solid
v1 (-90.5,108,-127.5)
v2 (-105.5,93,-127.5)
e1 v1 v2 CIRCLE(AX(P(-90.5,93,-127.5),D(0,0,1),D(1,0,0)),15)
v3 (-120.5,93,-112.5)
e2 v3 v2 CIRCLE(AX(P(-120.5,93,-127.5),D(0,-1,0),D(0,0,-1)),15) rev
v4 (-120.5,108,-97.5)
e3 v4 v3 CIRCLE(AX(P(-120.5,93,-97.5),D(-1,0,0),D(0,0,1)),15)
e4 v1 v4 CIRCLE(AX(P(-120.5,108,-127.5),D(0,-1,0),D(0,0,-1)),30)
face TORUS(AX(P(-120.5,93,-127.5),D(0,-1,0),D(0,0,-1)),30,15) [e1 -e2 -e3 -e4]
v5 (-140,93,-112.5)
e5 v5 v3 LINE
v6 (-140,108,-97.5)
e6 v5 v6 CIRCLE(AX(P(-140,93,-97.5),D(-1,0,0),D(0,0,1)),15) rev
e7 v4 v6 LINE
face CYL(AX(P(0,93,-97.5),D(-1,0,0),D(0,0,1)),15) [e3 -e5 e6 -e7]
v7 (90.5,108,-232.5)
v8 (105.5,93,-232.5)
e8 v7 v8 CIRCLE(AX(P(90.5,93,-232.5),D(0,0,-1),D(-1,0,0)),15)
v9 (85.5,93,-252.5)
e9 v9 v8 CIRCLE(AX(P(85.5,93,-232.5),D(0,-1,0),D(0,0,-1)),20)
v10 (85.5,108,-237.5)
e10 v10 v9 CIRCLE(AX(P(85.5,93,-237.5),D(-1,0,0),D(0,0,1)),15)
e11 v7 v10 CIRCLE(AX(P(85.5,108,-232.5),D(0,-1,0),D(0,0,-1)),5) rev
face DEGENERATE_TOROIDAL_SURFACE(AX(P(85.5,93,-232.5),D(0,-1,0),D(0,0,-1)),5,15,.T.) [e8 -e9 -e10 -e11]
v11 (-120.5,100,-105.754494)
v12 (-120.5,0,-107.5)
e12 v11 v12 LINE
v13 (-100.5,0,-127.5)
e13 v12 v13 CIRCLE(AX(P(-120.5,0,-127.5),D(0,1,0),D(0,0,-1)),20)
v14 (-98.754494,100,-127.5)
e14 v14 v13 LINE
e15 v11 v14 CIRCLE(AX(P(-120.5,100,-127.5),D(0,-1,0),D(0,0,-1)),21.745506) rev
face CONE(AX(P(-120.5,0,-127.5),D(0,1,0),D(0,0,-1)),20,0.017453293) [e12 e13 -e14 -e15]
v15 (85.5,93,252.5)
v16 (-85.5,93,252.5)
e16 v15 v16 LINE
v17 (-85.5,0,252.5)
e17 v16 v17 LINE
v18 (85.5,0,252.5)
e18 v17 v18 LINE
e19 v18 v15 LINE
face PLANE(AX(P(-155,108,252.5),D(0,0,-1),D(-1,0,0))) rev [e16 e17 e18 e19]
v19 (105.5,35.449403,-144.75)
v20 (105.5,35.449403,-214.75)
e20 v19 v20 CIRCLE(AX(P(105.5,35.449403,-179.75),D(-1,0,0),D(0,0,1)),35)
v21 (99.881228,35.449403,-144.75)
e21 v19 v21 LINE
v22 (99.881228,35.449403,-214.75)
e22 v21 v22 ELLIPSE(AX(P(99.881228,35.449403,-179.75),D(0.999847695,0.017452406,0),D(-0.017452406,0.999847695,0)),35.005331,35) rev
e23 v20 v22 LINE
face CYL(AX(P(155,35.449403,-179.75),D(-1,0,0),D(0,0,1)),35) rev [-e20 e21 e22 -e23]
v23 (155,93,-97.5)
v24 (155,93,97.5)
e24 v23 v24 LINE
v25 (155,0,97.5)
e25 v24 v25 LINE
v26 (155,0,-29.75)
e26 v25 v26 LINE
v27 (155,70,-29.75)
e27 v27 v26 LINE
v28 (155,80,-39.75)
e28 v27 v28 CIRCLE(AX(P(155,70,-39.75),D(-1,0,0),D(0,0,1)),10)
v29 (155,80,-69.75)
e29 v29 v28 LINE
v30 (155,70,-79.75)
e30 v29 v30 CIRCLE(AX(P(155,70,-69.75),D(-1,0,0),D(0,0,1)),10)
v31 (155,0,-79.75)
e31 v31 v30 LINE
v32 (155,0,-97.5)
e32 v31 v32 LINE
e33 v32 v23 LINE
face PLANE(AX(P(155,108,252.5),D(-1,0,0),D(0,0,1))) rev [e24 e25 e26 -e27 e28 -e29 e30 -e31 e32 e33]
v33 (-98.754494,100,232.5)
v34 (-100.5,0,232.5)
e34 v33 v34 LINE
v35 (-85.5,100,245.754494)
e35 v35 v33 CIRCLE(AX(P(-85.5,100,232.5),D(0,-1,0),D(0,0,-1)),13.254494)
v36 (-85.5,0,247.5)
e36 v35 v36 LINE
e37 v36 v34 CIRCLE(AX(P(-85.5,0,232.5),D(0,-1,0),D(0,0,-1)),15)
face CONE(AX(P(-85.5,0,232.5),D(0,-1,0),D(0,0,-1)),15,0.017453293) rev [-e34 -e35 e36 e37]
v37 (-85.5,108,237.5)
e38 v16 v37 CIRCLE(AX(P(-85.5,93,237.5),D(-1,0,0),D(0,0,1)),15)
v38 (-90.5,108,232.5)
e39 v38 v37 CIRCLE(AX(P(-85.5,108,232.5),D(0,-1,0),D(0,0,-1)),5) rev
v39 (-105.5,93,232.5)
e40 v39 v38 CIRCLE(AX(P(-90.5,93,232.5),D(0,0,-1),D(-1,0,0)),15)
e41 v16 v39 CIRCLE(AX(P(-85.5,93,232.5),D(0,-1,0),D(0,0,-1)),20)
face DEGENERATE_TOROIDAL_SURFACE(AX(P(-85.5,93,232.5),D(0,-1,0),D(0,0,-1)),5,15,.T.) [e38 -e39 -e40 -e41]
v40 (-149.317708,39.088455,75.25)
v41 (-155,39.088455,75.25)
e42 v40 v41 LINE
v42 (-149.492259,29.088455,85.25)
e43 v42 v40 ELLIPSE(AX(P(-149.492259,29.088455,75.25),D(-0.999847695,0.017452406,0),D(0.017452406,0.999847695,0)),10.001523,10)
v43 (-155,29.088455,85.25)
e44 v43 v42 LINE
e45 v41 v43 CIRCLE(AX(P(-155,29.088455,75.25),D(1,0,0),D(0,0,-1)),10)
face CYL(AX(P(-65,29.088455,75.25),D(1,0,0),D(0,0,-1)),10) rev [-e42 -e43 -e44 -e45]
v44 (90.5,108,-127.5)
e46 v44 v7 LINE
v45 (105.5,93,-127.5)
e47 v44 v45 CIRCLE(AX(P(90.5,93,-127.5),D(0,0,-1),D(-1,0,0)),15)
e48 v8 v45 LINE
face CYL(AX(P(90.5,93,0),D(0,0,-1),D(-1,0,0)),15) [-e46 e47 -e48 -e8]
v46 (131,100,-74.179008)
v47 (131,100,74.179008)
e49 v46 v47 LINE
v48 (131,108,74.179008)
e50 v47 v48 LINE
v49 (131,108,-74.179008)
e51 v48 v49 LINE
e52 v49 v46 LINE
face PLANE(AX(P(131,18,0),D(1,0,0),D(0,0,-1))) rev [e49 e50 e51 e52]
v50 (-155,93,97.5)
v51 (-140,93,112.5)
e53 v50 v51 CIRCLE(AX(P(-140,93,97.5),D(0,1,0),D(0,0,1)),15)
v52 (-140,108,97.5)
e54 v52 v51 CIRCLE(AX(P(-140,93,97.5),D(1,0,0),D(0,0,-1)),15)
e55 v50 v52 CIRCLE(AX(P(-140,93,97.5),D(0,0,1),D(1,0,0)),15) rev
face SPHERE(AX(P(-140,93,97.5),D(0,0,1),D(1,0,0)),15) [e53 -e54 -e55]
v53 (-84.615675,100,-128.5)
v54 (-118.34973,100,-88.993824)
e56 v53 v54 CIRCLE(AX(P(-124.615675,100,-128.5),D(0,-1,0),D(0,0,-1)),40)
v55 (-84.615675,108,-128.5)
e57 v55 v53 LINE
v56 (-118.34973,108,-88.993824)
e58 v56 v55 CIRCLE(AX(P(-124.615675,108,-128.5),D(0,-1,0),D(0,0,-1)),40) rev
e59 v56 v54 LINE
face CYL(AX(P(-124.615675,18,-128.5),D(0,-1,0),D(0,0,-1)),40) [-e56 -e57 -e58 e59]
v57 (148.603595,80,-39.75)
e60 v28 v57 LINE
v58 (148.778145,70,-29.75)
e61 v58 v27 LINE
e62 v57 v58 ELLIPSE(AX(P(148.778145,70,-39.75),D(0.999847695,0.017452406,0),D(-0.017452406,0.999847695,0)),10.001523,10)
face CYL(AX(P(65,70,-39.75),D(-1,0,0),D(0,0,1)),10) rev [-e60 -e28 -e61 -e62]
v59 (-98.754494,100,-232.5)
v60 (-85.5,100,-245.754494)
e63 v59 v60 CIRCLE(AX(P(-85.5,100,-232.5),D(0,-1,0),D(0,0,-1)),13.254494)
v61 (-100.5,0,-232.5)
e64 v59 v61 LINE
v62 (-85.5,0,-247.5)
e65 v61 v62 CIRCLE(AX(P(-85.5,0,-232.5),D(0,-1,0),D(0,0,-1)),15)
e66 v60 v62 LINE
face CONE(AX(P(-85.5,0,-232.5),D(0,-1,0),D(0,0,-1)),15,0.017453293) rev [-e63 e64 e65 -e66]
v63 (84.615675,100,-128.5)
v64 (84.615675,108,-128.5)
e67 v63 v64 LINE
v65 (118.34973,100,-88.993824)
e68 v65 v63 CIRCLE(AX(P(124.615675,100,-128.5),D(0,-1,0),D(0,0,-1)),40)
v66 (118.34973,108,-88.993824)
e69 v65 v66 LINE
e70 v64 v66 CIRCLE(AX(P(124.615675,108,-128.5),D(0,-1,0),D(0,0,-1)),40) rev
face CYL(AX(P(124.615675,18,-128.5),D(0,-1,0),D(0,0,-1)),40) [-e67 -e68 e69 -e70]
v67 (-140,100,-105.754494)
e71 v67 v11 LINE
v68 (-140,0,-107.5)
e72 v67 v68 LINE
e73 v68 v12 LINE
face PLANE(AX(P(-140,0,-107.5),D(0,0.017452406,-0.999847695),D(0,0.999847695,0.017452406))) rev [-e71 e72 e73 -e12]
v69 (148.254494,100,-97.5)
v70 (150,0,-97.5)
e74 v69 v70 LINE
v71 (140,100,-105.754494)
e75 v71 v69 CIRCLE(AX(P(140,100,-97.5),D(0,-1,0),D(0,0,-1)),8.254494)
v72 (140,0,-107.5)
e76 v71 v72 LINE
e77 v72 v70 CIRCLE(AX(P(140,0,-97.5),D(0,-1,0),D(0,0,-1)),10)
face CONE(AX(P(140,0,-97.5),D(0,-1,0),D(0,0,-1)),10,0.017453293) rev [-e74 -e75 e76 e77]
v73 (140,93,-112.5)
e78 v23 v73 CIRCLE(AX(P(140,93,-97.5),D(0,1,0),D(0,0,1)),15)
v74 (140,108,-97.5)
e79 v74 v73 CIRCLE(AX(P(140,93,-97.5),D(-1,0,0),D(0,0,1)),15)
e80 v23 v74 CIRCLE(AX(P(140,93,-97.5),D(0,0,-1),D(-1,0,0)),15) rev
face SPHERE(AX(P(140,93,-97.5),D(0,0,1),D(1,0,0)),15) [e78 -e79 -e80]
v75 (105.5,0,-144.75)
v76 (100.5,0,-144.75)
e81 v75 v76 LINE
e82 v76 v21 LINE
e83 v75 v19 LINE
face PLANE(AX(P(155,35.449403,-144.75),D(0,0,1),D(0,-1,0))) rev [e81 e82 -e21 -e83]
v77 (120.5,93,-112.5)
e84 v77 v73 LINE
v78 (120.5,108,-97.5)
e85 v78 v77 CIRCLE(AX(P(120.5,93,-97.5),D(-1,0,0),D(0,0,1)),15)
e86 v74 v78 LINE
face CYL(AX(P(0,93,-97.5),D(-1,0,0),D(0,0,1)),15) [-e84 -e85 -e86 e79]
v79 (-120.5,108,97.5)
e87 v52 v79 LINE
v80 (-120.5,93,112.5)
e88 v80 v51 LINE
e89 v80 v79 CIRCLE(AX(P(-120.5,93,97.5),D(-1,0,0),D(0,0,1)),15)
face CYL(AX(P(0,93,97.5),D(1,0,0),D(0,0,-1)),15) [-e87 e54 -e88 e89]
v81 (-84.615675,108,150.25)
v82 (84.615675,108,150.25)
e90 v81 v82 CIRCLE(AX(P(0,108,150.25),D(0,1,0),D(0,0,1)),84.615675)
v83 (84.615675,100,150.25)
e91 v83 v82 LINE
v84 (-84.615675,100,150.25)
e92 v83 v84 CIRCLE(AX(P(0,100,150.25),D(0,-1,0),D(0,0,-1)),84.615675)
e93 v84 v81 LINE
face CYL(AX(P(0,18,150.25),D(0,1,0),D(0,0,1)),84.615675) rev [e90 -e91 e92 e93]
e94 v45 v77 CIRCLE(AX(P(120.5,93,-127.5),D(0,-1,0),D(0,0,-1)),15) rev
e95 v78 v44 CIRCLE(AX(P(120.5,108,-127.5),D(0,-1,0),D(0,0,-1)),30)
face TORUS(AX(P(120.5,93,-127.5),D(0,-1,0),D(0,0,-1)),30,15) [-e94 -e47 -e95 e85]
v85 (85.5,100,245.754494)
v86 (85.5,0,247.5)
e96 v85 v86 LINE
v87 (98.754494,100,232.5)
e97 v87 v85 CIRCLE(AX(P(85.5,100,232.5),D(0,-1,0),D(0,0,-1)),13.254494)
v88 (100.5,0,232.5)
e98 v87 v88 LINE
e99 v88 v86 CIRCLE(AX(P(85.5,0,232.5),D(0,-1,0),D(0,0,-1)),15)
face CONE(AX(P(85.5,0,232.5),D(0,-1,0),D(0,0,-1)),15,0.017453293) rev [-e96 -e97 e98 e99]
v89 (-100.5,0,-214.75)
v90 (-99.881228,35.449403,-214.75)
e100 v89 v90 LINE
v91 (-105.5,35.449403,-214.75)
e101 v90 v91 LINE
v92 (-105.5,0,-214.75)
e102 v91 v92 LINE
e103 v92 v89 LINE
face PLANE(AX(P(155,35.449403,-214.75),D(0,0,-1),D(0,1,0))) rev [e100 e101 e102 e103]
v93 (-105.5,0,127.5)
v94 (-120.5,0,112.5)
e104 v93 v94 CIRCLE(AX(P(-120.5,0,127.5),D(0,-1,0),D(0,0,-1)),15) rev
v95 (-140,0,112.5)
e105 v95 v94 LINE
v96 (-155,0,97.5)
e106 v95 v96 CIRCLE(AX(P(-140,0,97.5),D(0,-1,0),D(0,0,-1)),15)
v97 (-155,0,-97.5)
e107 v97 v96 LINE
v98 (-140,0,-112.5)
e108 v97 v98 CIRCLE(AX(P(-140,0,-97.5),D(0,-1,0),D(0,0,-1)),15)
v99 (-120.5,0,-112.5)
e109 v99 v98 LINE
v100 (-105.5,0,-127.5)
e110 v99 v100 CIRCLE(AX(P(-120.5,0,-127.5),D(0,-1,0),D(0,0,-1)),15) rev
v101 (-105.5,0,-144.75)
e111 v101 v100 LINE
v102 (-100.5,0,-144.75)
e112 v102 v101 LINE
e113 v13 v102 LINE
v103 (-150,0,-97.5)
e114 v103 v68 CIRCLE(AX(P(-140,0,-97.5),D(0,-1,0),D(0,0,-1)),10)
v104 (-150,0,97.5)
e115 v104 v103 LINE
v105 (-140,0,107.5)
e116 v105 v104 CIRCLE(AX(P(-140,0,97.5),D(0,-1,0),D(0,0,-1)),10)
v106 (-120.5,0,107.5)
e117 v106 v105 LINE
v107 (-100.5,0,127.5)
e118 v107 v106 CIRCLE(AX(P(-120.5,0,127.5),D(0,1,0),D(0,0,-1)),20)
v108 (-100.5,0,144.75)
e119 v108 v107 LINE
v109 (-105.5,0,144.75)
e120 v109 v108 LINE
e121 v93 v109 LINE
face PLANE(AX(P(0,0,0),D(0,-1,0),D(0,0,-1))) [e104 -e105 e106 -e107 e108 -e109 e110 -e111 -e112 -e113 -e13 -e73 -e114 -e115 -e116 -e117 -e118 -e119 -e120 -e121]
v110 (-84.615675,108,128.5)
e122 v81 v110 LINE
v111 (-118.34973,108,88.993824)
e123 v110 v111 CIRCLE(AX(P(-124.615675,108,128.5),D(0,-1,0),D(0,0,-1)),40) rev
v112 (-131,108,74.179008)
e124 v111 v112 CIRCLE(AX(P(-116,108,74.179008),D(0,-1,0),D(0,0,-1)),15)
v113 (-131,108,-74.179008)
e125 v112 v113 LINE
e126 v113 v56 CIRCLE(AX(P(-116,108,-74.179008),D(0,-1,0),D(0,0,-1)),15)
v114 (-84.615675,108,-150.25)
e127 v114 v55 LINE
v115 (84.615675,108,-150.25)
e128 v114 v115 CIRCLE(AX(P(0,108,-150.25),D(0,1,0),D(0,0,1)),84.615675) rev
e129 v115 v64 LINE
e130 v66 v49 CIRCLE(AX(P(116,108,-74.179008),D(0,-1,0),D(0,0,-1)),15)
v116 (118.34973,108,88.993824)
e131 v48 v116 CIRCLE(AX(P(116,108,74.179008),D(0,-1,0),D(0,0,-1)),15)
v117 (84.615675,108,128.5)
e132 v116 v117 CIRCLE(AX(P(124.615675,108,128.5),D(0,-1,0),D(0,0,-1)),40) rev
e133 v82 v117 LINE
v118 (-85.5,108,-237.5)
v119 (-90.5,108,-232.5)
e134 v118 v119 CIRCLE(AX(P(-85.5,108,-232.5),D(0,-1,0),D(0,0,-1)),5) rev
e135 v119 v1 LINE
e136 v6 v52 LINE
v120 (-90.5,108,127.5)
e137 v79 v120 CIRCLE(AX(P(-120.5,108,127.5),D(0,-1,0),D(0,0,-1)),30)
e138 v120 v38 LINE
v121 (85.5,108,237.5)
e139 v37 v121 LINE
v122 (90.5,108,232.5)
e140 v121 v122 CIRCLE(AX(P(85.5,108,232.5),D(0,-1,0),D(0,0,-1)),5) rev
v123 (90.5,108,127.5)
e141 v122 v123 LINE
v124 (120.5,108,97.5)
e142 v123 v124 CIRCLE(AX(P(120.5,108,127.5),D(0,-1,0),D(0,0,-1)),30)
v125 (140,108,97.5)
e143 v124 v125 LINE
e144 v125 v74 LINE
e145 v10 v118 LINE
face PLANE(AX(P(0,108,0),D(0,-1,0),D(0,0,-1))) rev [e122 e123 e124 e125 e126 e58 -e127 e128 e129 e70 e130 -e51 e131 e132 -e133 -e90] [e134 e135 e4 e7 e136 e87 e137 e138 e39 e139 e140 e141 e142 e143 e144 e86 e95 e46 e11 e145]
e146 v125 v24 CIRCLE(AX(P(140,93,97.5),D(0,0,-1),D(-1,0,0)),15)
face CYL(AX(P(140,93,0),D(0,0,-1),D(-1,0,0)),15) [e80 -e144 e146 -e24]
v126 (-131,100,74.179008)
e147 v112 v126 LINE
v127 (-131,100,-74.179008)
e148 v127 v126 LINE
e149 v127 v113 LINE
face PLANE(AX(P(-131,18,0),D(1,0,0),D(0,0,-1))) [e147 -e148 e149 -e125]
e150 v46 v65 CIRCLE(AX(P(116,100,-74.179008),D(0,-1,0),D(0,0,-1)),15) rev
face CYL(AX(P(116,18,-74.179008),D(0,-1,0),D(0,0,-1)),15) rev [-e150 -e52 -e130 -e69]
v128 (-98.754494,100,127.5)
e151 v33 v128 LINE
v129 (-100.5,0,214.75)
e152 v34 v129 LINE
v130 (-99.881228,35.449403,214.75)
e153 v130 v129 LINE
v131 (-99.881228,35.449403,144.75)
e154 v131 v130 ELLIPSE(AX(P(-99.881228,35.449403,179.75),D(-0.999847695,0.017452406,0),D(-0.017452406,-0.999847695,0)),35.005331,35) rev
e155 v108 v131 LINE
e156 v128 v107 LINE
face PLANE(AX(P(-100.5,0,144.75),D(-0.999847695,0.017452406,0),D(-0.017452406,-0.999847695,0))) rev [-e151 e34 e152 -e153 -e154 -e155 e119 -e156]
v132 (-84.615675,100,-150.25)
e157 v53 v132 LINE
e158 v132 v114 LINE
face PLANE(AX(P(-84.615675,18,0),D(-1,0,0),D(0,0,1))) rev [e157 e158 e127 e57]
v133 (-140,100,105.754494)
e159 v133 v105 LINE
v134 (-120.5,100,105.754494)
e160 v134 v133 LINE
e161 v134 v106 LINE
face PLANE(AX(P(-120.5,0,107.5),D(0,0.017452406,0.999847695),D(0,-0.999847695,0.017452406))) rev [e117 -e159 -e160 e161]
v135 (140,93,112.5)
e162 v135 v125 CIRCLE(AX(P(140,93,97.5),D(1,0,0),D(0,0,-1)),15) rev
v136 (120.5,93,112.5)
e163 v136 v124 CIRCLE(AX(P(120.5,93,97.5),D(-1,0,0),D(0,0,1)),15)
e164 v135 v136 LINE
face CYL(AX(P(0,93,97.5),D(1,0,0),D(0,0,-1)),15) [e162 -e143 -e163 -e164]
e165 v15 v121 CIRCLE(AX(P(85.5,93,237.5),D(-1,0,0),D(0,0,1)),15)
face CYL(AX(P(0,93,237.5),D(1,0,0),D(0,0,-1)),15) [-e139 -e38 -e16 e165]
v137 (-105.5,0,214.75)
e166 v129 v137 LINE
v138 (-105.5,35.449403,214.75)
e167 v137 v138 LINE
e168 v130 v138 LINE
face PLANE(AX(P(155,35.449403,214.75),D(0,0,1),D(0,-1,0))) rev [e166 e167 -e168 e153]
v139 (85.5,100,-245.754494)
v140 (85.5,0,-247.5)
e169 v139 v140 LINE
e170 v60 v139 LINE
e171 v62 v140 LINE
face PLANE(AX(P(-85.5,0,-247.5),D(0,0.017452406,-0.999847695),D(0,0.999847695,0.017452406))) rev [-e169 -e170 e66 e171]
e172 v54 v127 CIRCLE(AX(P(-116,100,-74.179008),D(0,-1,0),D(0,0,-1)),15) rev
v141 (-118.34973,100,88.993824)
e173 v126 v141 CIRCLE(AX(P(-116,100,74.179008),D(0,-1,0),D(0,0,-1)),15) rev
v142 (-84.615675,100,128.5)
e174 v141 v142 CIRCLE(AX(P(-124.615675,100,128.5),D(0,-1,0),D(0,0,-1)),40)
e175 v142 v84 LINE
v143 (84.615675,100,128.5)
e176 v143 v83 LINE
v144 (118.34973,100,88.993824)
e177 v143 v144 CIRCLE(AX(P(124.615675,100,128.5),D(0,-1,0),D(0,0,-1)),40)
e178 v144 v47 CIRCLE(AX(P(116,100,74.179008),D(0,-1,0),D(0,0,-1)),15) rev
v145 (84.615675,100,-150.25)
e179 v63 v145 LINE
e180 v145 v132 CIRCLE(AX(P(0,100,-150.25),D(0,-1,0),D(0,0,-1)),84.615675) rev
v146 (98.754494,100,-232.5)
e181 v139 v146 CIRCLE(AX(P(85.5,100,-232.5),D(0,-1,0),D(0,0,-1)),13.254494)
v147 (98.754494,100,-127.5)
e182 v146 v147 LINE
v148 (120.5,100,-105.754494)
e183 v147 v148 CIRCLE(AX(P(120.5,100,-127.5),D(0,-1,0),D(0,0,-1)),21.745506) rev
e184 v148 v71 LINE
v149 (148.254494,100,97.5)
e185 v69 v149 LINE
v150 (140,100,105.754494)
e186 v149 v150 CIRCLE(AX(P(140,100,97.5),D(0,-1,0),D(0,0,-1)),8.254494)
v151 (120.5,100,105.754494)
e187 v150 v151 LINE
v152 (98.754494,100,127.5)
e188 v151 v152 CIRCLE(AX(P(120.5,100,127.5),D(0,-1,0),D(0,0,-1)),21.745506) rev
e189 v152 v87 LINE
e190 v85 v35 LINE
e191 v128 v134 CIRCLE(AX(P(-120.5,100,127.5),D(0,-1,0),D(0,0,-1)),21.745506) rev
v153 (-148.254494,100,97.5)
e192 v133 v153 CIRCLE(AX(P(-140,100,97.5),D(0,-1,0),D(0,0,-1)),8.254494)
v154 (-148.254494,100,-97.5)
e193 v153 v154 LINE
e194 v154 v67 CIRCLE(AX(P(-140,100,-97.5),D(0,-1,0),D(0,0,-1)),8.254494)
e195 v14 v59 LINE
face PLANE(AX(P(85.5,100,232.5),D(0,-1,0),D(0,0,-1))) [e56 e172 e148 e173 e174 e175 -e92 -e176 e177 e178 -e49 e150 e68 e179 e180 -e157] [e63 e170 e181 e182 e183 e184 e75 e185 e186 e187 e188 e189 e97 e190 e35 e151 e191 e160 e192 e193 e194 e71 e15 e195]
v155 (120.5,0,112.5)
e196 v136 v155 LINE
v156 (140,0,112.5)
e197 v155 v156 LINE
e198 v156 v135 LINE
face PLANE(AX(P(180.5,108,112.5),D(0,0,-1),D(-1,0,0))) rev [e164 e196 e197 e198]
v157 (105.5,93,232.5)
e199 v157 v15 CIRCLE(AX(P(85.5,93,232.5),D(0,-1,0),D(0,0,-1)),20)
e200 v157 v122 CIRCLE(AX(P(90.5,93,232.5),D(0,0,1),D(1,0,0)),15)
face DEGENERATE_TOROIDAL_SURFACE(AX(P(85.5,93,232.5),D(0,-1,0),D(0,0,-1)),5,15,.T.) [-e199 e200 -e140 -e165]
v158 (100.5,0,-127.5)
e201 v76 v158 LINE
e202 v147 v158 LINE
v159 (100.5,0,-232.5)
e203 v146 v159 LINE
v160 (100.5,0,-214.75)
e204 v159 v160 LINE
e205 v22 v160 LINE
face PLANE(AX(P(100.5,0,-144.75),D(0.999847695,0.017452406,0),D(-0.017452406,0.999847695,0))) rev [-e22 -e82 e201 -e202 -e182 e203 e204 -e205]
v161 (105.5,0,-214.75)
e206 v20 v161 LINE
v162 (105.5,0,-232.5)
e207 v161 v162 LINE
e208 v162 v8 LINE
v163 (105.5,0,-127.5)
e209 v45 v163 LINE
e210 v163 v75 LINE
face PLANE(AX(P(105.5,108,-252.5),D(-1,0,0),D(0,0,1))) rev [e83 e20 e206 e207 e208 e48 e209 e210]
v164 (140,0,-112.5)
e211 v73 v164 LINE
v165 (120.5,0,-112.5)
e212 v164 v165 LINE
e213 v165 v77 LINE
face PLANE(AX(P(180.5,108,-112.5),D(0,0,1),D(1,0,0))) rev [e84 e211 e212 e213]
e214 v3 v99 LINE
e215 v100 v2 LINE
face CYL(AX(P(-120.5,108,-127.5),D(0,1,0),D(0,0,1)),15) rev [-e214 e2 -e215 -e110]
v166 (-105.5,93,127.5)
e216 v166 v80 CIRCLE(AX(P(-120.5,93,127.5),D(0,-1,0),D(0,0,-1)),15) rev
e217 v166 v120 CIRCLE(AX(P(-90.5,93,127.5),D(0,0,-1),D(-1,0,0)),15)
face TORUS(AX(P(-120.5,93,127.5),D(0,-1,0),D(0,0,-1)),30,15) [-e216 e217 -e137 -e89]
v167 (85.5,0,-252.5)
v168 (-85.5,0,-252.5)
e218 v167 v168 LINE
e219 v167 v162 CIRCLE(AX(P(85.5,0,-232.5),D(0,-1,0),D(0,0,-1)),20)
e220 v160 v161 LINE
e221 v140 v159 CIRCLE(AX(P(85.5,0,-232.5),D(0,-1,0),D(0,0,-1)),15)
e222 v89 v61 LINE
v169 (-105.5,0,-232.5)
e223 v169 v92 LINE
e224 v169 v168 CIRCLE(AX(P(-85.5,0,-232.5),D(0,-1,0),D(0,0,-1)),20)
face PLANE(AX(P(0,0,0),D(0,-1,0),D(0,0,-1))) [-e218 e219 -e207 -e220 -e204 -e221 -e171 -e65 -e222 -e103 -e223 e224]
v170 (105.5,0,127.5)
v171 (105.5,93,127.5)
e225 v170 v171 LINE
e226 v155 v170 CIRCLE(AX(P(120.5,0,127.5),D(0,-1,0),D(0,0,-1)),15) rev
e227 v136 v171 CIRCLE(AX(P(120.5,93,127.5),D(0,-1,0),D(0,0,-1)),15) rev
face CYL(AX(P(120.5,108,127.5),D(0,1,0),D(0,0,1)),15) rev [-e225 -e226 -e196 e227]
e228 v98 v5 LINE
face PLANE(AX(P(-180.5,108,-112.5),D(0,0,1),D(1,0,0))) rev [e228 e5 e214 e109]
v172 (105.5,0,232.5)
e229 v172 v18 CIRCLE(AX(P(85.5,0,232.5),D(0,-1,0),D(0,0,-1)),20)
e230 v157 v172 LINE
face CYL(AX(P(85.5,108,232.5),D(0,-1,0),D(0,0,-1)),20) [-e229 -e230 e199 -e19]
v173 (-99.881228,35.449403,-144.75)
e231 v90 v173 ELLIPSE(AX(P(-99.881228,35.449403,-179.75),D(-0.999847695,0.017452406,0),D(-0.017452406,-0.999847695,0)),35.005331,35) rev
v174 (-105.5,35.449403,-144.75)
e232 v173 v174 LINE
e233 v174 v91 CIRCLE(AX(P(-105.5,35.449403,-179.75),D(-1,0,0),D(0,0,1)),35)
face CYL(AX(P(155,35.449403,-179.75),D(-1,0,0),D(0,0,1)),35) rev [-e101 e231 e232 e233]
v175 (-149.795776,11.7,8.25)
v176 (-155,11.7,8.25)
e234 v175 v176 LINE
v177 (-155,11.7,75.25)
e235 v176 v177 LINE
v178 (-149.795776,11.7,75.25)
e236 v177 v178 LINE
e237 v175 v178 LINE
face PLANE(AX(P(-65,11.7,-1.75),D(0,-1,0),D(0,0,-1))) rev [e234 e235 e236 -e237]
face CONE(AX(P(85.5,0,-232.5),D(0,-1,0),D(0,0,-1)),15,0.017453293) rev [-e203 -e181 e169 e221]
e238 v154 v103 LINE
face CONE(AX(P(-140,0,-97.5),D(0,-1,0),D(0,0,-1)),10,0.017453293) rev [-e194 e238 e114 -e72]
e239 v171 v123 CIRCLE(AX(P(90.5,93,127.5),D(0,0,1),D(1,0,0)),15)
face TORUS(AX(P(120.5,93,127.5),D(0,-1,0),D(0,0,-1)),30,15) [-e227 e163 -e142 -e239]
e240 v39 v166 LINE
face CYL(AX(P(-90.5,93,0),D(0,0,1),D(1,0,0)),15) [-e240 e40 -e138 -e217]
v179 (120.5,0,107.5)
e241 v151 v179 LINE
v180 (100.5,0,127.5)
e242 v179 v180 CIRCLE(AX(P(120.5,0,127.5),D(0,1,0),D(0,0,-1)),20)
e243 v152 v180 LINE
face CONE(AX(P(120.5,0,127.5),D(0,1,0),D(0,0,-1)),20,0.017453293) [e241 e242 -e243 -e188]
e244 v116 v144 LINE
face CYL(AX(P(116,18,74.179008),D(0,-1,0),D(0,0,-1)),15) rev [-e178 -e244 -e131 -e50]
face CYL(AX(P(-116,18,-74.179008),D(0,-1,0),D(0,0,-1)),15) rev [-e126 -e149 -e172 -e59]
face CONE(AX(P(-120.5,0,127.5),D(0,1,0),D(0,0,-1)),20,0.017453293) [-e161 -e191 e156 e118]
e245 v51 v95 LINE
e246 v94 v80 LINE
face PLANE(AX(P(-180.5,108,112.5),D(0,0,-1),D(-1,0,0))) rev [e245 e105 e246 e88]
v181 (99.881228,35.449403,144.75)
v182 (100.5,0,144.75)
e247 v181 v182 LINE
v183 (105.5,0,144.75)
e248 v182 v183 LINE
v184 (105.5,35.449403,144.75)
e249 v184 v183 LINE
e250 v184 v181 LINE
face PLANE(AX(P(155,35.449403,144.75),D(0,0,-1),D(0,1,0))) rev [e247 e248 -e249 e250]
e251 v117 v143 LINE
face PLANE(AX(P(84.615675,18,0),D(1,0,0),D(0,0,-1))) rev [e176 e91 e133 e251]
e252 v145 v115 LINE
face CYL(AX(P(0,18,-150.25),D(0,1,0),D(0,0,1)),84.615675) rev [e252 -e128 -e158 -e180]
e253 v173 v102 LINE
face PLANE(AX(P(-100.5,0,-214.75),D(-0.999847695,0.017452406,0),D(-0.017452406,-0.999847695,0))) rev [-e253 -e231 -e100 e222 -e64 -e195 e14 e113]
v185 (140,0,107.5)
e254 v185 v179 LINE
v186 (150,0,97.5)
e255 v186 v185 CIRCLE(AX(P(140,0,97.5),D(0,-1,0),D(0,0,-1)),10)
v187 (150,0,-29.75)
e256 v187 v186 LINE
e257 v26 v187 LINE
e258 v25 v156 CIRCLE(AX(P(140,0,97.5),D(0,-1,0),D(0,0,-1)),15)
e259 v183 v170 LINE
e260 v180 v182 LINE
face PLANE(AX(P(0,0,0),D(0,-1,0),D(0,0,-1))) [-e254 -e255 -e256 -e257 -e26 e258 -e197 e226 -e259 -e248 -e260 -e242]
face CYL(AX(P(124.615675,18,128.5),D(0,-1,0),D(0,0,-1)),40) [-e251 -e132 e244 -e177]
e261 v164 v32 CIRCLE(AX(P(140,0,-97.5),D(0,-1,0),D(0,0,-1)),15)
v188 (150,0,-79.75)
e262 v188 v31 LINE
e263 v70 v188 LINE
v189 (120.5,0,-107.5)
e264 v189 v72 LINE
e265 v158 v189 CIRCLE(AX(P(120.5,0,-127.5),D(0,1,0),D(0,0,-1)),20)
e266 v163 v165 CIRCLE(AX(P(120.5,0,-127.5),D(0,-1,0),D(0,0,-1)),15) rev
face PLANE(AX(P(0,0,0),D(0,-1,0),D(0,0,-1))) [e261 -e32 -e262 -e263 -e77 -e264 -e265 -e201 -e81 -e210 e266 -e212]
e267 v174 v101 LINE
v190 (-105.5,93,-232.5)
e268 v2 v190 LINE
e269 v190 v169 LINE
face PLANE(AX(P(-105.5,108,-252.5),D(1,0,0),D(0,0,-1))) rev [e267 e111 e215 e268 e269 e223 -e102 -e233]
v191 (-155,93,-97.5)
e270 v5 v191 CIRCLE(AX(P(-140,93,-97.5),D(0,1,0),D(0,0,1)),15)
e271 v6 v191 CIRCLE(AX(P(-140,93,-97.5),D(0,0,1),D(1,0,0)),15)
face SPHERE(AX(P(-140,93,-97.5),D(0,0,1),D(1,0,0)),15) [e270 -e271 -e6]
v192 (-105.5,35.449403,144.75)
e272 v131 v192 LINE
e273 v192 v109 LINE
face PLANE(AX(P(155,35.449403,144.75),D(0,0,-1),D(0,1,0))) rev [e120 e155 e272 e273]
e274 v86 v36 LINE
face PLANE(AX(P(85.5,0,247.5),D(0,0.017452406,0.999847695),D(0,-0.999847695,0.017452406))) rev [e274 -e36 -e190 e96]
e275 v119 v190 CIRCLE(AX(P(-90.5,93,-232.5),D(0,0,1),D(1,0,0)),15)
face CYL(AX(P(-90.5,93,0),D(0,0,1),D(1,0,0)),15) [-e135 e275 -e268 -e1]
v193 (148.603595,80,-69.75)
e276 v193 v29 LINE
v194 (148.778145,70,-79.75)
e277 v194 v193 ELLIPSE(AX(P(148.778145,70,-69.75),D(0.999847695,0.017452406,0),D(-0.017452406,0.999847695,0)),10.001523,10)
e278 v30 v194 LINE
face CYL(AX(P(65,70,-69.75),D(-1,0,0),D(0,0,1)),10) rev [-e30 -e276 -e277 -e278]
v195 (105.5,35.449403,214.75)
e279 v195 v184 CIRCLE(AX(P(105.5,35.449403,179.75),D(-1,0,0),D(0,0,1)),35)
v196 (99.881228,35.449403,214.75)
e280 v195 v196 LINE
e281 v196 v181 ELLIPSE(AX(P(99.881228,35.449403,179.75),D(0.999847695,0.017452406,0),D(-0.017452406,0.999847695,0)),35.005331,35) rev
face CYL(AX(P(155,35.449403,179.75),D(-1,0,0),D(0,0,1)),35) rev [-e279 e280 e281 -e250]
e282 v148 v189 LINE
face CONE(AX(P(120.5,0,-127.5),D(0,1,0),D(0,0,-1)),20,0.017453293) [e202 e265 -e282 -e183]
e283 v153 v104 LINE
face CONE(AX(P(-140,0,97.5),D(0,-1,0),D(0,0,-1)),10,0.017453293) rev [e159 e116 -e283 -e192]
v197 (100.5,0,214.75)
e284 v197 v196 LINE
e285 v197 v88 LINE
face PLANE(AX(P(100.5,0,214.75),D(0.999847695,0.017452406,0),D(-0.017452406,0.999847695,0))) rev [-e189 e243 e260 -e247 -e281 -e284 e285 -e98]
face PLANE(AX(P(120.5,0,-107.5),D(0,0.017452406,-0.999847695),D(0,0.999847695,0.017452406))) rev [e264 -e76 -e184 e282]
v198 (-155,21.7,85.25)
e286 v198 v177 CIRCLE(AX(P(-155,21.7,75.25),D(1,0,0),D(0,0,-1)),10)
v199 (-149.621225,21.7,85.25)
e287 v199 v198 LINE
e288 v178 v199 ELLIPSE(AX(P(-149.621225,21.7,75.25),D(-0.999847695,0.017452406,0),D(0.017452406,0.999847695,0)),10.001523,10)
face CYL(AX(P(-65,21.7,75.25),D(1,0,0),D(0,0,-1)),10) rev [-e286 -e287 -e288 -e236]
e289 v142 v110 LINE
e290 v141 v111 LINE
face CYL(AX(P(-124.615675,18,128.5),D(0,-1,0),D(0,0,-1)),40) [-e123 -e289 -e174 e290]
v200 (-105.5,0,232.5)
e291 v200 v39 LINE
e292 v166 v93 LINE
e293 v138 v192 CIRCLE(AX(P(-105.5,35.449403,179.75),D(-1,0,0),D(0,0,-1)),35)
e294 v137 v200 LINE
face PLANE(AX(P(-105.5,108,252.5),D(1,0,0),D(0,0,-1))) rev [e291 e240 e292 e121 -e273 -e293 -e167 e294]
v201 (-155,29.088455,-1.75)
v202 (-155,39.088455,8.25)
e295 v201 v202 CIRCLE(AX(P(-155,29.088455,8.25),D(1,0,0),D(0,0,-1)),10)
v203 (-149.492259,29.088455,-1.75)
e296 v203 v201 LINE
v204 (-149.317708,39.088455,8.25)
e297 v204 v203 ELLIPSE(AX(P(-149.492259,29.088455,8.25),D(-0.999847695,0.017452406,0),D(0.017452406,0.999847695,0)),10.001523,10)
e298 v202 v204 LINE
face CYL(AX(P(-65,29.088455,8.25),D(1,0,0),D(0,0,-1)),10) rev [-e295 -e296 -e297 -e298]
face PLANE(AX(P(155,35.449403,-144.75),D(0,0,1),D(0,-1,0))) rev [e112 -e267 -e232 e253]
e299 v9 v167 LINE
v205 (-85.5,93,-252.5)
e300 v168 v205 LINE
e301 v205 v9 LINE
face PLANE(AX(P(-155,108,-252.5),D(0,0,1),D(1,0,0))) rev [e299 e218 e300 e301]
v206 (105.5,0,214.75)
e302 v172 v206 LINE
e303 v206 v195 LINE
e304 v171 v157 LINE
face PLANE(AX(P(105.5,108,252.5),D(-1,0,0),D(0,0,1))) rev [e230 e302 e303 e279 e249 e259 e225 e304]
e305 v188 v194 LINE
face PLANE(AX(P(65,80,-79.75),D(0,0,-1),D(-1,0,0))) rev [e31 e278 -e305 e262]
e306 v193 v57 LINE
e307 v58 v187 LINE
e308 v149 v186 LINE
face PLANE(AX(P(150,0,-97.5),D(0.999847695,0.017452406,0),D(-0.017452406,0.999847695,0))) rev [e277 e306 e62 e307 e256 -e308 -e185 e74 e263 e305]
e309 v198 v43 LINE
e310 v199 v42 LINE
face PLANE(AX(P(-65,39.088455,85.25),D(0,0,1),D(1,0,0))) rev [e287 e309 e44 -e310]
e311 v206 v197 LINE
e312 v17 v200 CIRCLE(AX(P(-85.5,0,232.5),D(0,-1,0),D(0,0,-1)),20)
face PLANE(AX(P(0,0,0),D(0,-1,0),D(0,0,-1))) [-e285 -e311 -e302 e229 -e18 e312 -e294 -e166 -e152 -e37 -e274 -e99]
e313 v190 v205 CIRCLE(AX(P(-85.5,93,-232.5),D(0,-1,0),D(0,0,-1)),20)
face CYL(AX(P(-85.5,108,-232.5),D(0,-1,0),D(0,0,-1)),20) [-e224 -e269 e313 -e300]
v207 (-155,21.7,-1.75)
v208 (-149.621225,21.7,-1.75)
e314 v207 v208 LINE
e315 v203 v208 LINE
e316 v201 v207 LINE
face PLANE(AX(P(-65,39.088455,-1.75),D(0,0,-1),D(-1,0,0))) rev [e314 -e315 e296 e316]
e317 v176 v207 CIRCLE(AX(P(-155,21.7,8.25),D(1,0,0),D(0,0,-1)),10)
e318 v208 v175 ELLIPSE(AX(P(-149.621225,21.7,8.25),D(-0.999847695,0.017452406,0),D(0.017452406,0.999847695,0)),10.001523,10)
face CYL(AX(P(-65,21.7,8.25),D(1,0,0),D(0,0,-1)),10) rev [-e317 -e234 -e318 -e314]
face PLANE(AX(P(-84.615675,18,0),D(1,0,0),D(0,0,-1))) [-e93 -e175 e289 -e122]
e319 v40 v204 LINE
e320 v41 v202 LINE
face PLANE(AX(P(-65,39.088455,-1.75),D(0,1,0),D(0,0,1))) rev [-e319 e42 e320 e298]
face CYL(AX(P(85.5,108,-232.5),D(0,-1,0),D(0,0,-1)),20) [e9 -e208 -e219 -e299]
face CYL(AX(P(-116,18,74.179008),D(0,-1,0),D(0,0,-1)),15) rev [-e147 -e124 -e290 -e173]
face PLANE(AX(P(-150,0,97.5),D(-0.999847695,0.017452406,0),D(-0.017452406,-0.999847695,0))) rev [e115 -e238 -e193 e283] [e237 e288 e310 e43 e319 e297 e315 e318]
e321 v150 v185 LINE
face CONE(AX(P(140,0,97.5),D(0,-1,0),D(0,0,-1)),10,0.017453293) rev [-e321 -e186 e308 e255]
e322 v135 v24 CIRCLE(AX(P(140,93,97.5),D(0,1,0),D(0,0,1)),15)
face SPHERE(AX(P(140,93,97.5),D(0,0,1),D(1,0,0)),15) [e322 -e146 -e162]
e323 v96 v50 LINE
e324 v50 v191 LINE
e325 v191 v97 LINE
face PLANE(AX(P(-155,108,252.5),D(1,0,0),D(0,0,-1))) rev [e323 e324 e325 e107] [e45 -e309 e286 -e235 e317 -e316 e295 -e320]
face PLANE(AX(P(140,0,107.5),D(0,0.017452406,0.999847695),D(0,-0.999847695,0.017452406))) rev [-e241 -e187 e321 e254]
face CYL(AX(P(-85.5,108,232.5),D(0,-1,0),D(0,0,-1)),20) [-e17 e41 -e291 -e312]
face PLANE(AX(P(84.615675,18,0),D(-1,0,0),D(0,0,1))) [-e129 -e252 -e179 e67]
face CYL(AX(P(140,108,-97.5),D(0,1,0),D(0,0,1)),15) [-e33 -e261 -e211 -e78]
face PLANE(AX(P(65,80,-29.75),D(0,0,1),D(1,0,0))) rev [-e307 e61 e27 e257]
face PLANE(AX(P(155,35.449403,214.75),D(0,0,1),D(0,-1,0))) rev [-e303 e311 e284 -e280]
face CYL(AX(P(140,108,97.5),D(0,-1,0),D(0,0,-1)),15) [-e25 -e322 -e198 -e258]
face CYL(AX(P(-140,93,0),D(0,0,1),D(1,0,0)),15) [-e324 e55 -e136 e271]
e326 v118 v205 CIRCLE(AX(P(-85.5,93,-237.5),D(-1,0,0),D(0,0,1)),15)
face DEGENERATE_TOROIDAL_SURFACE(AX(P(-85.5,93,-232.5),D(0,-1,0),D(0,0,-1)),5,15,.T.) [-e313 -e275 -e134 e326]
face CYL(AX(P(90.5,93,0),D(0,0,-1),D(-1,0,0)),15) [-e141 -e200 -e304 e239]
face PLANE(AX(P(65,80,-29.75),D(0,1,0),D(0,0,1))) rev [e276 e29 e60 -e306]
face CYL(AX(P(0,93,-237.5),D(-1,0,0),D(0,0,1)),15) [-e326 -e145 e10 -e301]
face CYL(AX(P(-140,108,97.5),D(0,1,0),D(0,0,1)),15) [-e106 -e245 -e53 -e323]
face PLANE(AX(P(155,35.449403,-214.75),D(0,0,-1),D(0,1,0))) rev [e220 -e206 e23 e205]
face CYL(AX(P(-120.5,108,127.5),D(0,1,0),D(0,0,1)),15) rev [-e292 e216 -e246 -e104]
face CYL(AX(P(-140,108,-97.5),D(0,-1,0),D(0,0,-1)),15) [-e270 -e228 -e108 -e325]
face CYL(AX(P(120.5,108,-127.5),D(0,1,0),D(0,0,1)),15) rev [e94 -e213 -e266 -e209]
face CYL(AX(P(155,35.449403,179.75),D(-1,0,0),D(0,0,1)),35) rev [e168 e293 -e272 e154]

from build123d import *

# Parameters (mm, degrees)
SKETCH1_W           = 310
SKETCH1_H           = 505
BOSS_EXTRUDE1_DEPTH = 108
SKETCH2_W           = 75
SKETCH2_H           = 140
CUT_EXTRUDE1_DEPTH  = 316.349409386
FILLET1_R           = 15
FILLET3_R           = 20
FILLET4_R           = 15
FILLET5_R           = 15
CUT_EXTRUDE2_DEPTH  = 379.524107555
CUT_EXTRUDE3_DEPTH  = 100
CUT_EXTRUDE3_DRAFT  = -1
SKETCH18_W          = 87
SKETCH18_H          = 27.388454903
CUT_EXTRUDE4_DEPTH  = 90
FILLET6_R           = 10
SKETCH19_W          = 50
SKETCH19_H          = 98.394535989
CUT_EXTRUDE5_DEPTH  = 90
FILLET7_R           = 10
CUT_EXTRUDE7_DEPTH  = 90
FILLET12_R          = 40
FILLET13_R          = 15


with BuildPart() as part:
    # Sketch1 → Boss-Extrude1 (new body)
    with BuildSketch(Plane(origin=(0, 0, 0), x_dir=(1, 0, 0), z_dir=(0, 1, 0))):
        Rectangle(SKETCH1_W, SKETCH1_H)
    extrude(amount=BOSS_EXTRUDE1_DEPTH)

    # Sketch2 → Cut-Extrude1 (cut, through all)
    with BuildSketch(Plane(origin=(0, 0, 0), x_dir=(-1, 0, 0), z_dir=(0, -1, 0))):
        with Locations((143, -182.5)):
            Rectangle(SKETCH2_W, SKETCH2_H)
        with Locations((-143, -182.5)):
            Rectangle(SKETCH2_W, SKETCH2_H)
        with Locations((-143, 182.5)):
            Rectangle(SKETCH2_W, SKETCH2_H)
        with Locations((143, 182.5)):
            Rectangle(SKETCH2_W, SKETCH2_H)
    extrude(amount=-CUT_EXTRUDE1_DEPTH, mode=Mode.SUBTRACT)

    # Fillet1
    fillet1_edges = [part.edges().sort_by_distance(p)[0] for p in [
        (-105.5, 54, -112.5),
        (105.5, 54, -112.5),
        (105.5, 54, 112.5),
        (-105.5, 54, 112.5),
    ]]
    fillet(fillet1_edges, radius=FILLET1_R)

    # Fillet3
    fillet3_edges = [part.edges().sort_by_distance(p)[0] for p in [
        (-105.5, 54, -252.5),
        (105.5, 54, -252.5),
        (105.5, 54, 252.5),
        (-105.5, 54, 252.5),
    ]]
    fillet(fillet3_edges, radius=FILLET3_R)

    # Fillet4
    fillet4_edges = [part.edges().sort_by_distance(p)[0] for p in [
        (105.5, 108, 180),
        (0, 108, 252.5),
        (-105.5, 108, -180),
        (0, 108, -252.5),
        (-99.642135624, 108, -246.642135624),
        (99.642135624, 108, -246.642135624),
        (-99.642135624, 108, 246.642135624),
        (99.642135624, 108, 246.642135624),
        (155, 108, 0),
        (-155, 108, 0),
        (137.75, 108, -112.5),
        (-137.75, 108, 112.5),
        (137.75, 108, 112.5),
        (-105.5, 108, 180),
        (105.5, 108, -180),
        (-137.75, 108, -112.5),
        (109.893398282, 108, 116.893398282),
        (-109.893398282, 108, 116.893398282),
        (109.893398282, 108, -116.893398282),
        (-109.893398282, 108, -116.893398282),
    ]]
    fillet(fillet4_edges, radius=FILLET4_R)

    # Fillet5
    # the kernel refuses this fillet: 15 mm, written as the material it takes off along each edge
    with BuildSketch(Plane(origin=(140, 93, -97.5), x_dir=(0, 0, -1), z_dir=(1, 0, 0))) as fillet5_piece_1_section:
        Polygon((0, 0), (FILLET5_R, 0), (FILLET5_R, FILLET5_R), (0, FILLET5_R), align=None)
    fillet5_piece_1 = extrude(amount=FILLET5_R, mode=Mode.PRIVATE)
    fillet5_piece_1 = fillet5_piece_1 - Plane(origin=(140, 93, -97.5), x_dir=(0, -0.7071067811865475, 0.7071067811865475), z_dir=(1, 0, 0)) * Sphere(FILLET5_R, mode=Mode.PRIVATE)
    add(fillet5_piece_1, mode=Mode.SUBTRACT)
    with BuildSketch(Plane(origin=(140, 93, 97.5), x_dir=(1, 0, 0), z_dir=(0, 0, 1))) as fillet5_piece_2_section:
        Polygon((0, 0), (FILLET5_R, 0), (FILLET5_R, FILLET5_R), (0, FILLET5_R), align=None)
    fillet5_piece_2 = extrude(amount=FILLET5_R, mode=Mode.PRIVATE)
    fillet5_piece_2 = fillet5_piece_2 - Plane(origin=(140, 93, 97.5), x_dir=(-0.7071067811865475, -0.7071067811865475, 0), z_dir=(0, 0, 1)) * Sphere(FILLET5_R, mode=Mode.PRIVATE)
    add(fillet5_piece_2, mode=Mode.SUBTRACT)
    with BuildSketch(Plane(origin=(-140, 93, -97.5), x_dir=(0, 0, -1), z_dir=(-1, 0, 0))) as fillet5_piece_3_section:
        Polygon((0, 0), (FILLET5_R, 0), (FILLET5_R, -FILLET5_R), (0, -FILLET5_R), align=None)
    fillet5_piece_3 = extrude(amount=FILLET5_R, mode=Mode.PRIVATE)
    fillet5_piece_3 = fillet5_piece_3 - Plane(origin=(-140, 93, -97.5), x_dir=(0, -0.7071067811865475, 0.7071067811865475), z_dir=(-1, 0, 0)) * Sphere(FILLET5_R, mode=Mode.PRIVATE)
    add(fillet5_piece_3, mode=Mode.SUBTRACT)
    with BuildSketch(Plane(origin=(-140, 93, 97.5), x_dir=(-1, 0, 0), z_dir=(0, 0, 1))) as fillet5_piece_4_section:
        Polygon((0, 0), (FILLET5_R, 0), (FILLET5_R, -FILLET5_R), (0, -FILLET5_R), align=None)
    fillet5_piece_4 = extrude(amount=FILLET5_R, mode=Mode.PRIVATE)
    fillet5_piece_4 = fillet5_piece_4 - Plane(origin=(-140, 93, 97.5), x_dir=(0.7071067811865475, -0.7071067811865475, 0), z_dir=(0, 0, 1)) * Sphere(FILLET5_R, mode=Mode.PRIVATE)
    add(fillet5_piece_4, mode=Mode.SUBTRACT)
    with BuildSketch(Plane(origin=(155, 93, 112.5), x_dir=(-1, 0, 0), z_dir=(0, -1, 0)), Plane(origin=(155, 93, -112.5), x_dir=(0, 0, 1), z_dir=(0, -1, 0))) as fillet5_piece_5:
        with BuildLine():
            CenterArc((FILLET5_R, FILLET5_R), FILLET5_R, 180, 90)
            Line((0, FILLET5_R), (0, 0))
            Line((0, 0), (FILLET5_R, 0))
        make_face()
    extrude(amount=130.5, mode=Mode.SUBTRACT)
    with BuildSketch(Plane(origin=(-155, 93, -112.5), x_dir=(0, 0, 1), z_dir=(0, -1, 0)), Plane(origin=(-155, 93, 112.5), x_dir=(1, 0, 0), z_dir=(0, -1, 0))) as fillet5_piece_6:
        with BuildLine():
            CenterArc((FILLET5_R, -FILLET5_R), FILLET5_R, 90, 90)
            Line((0, -FILLET5_R), (0, 0))
            Line((0, 0), (FILLET5_R, 0))
        make_face()
    extrude(amount=130.5, mode=Mode.SUBTRACT)

    # Sketch16 → Cut-Extrude2 (cut, through all)
    with BuildSketch(Plane.ZY.offset(105.5)):
        with BuildLine():
            Line((-144.75, 35.449402931), (-144.75, -45.449402931))
            ThreePointArc((-144.75, -45.449402931), (-179.75, -80.449402931), (-214.75, -45.449402931))
            Line((-214.75, -45.449402931), (-214.75, 35.449402931))
            ThreePointArc((-214.75, 35.449402931), (-179.75, 70.449402931), (-144.75, 35.449402931))
        make_face()
        with BuildLine():
            Line((144.75, 35.449402931), (144.75, -45.449402931))
            ThreePointArc((144.75, -45.449402931), (179.75, -80.449402931), (214.75, -45.449402931))
            Line((214.75, -45.449402931), (214.75, 35.449402931))
            ThreePointArc((214.75, 35.449402931), (179.75, 70.449402931), (144.75, 35.449402931))
        make_face()
    extrude(amount=-CUT_EXTRUDE2_DEPTH, mode=Mode.SUBTRACT)


with BuildPart() as cut_extrude3_tool:
    # Sketch17 → Cut-Extrude3 (with draft: the straight prism first)
    with BuildSketch(Plane(origin=(0, 0, 0), x_dir=(-1, 0, 0), z_dir=(0, -1, 0))):
        with BuildLine():
            Line((-100.5, -214.75), (-100.5, -232.5))
            ThreePointArc((-100.5, -232.5), (-96.106601718, -243.106601718), (-85.5, -247.5))
            Line((-85.5, -247.5), (85.5, -247.5))
            ThreePointArc((85.5, -247.5), (96.106601718, -243.106601718), (100.5, -232.5))
            Line((100.5, -232.5), (100.5, -214.75))
            Line((100.5, -214.75), (100.5, -144.75))
            Line((100.5, -144.75), (100.5, -127.5))
            ThreePointArc((100.5, -127.5), (106.357864376, -113.357864376), (120.5, -107.5))
            Line((120.5, -107.5), (140, -107.5))
            ThreePointArc((140, -107.5), (147.071067812, -104.571067812), (150, -97.5))
            Line((150, -97.5), (150, 97.5))
            ThreePointArc((150, 97.5), (147.071067812, 104.571067812), (140, 107.5))
            Line((140, 107.5), (120.5, 107.5))
            ThreePointArc((120.5, 107.5), (106.357864376, 113.357864376), (100.5, 127.5))
            Line((100.5, 127.5), (100.5, 144.75))
            Line((100.5, 144.75), (100.5, 214.75))
            Line((100.5, 214.75), (100.5, 232.5))
            ThreePointArc((100.5, 232.5), (96.106601718, 243.106601718), (85.5, 247.5))
            Line((85.5, 247.5), (-85.5, 247.5))
            ThreePointArc((-85.5, 247.5), (-96.106601718, 243.106601718), (-100.5, 232.5))
            Line((-100.5, 232.5), (-100.5, 214.75))
            Line((-100.5, 214.75), (-100.5, 144.75))
            Line((-100.5, 144.75), (-100.5, 127.5))
            ThreePointArc((-100.5, 127.5), (-106.357864376, 113.357864376), (-120.5, 107.5))
            Line((-120.5, 107.5), (-140, 107.5))
            ThreePointArc((-140, 107.5), (-147.071067812, 104.571067812), (-150, 97.5))
            Line((-150, 97.5), (-150, -97.5))
            ThreePointArc((-150, -97.5), (-147.071067812, -104.571067812), (-140, -107.5))
            Line((-140, -107.5), (-120.5, -107.5))
            ThreePointArc((-120.5, -107.5), (-106.357864376, -113.357864376), (-100.5, -127.5))
            Line((-100.5, -127.5), (-100.5, -144.75))
            Line((-100.5, -144.75), (-100.5, -214.75))
        make_face()
    extrude(amount=-CUT_EXTRUDE3_DEPTH)
    # Cut-Extrude3: the draft: its side faces are tilted about the plane it starts from
    cut_extrude3_sides = [cut_extrude3_tool.faces().sort_by_distance(p)[0] for p in [
        (106.357864376, 50, 113.357864376),
        (147.071067812, 50, 104.571067812),
        (150, 50, 0),
        (147.071067812, 50, -104.571067812),
        (130.25, 50, -107.5),
        (106.357864376, 50, -113.357864376),
        (100.5, 50, -180),
        (96.106601718, 50, -243.106601718),
        (0, 50, -247.5),
        (-96.106601718, 50, -243.106601718),
        (-100.5, 50, -180),
        (-106.357864376, 50, -113.357864376),
        (-130.25, 50, -107.5),
        (-147.071067812, 50, -104.571067812),
        (-150, 50, 0),
        (-147.071067812, 50, 104.571067812),
        (-130.25, 50, 107.5),
        (-106.357864376, 50, 113.357864376),
        (-100.5, 50, 180),
        (-96.106601718, 50, 243.106601718),
        (0, 50, 247.5),
        (96.106601718, 50, 243.106601718),
        (100.5, 50, 180),
        (130.25, 50, 107.5),
    ]]
    draft(cut_extrude3_sides, Plane(origin=(0, 0, 0), x_dir=(-1, 0, 0), z_dir=(0, -1, 0)), CUT_EXTRUDE3_DRAFT)


with BuildPart() as part_1:
    add(part.part)

    # Cut-Extrude3: cut by cut_extrude3_tool
    add(cut_extrude3_tool.part, mode=Mode.SUBTRACT)

    # Sketch18 → Cut-Extrude4 (cut)
    with BuildSketch(Plane.ZY.offset(155)):
        with Locations((41.75, 25.394227452)):
            Rectangle(SKETCH18_W, SKETCH18_H)
    extrude(amount=-CUT_EXTRUDE4_DEPTH, mode=Mode.SUBTRACT)

    # Fillet6
    fillet6_edges = [part_1.edges().sort_by_distance(p)[0] for p in [
        (-152.39788787, 11.7, -1.75),
        (-152.158854241, 39.088454903, -1.75),
        (-152.158854241, 39.088454903, 85.25),
        (-152.39788787, 11.7, 85.25),
    ]]
    fillet(fillet6_edges, radius=FILLET6_R)

    # Sketch19 → Cut-Extrude5 (cut)
    with BuildSketch(Plane(origin=(155, 0, 0), x_dir=(0, 0, -1), z_dir=(1, 0, 0))):
        with Locations((54.75, 30.802732005)):
            Rectangle(SKETCH19_W, SKETCH19_H)
    extrude(amount=-CUT_EXTRUDE5_DEPTH, mode=Mode.SUBTRACT)

    # Fillet7
    fillet7_edges = [part_1.edges().sort_by_distance(p)[0] for p in [
        (151.801797403, 80, -29.75),
        (151.801797403, 80, -79.75),
    ]]
    fillet(fillet7_edges, radius=FILLET7_R)

    # Sketch20 → Cut-Extrude7 (cut)
    with BuildSketch(Plane(origin=(0, 108, 0), x_dir=(1, 0, 0), z_dir=(0, 1, 0))):
        with BuildLine():
            Line((-131, -88.5), (-120.5, -88.5))
            ThreePointArc((-120.5, -88.5), (-98.990836138, -94.967618132), (-84.615675262, -112.225340001))
            Line((-84.615675262, -112.225340001), (-84.615675262, -150.25))
            ThreePointArc((-84.615675262, -150.25), (0, -234.865675262), (84.615675262, -150.25))
            Line((84.615675262, -150.25), (84.615675262, -112.225340001))
            ThreePointArc((84.615675262, -112.225340001), (98.990836138, -94.967618132), (120.5, -88.5))
            Line((120.5, -88.5), (131, -88.5))
            Line((131, -88.5), (131, 88.5))
            Line((131, 88.5), (120.5, 88.5))
            ThreePointArc((120.5, 88.5), (98.990836138, 94.967618132), (84.615675262, 112.225340001))
            Line((84.615675262, 112.225340001), (84.615675262, 150.25))
            ThreePointArc((84.615675262, 150.25), (0, 234.865675262), (-84.615675262, 150.25))
            Line((-84.615675262, 150.25), (-84.615675262, 112.225340001))
            ThreePointArc((-84.615675262, 112.225340001), (-98.990836138, 94.967618132), (-120.5, 88.5))
            Line((-120.5, 88.5), (-131, 88.5))
            Line((-131, 88.5), (-131, -88.5))
        make_face()
    extrude(amount=-CUT_EXTRUDE7_DEPTH, mode=Mode.SUBTRACT)

    # Fillet12
    fillet12_edges = [part_1.edges().sort_by_distance(p)[0] for p in [
        (-84.615675262, 104, 112.225340001),
        (84.615675262, 104, 112.225340001),
        (84.615675262, 104, -112.225340001),
        (-84.615675262, 104, -112.225340001),
    ]]
    fillet(fillet12_edges, radius=FILLET12_R)

    # Fillet13
    fillet13_edges = [part_1.edges().sort_by_distance(p)[0] for p in [
        (-131, 104, 88.5),
        (131, 104, -88.5),
        (131, 104, 88.5),
        (-131, 104, -88.5),
    ]]
    fillet(fillet13_edges, radius=FILLET13_R)


solid = part_1.part
